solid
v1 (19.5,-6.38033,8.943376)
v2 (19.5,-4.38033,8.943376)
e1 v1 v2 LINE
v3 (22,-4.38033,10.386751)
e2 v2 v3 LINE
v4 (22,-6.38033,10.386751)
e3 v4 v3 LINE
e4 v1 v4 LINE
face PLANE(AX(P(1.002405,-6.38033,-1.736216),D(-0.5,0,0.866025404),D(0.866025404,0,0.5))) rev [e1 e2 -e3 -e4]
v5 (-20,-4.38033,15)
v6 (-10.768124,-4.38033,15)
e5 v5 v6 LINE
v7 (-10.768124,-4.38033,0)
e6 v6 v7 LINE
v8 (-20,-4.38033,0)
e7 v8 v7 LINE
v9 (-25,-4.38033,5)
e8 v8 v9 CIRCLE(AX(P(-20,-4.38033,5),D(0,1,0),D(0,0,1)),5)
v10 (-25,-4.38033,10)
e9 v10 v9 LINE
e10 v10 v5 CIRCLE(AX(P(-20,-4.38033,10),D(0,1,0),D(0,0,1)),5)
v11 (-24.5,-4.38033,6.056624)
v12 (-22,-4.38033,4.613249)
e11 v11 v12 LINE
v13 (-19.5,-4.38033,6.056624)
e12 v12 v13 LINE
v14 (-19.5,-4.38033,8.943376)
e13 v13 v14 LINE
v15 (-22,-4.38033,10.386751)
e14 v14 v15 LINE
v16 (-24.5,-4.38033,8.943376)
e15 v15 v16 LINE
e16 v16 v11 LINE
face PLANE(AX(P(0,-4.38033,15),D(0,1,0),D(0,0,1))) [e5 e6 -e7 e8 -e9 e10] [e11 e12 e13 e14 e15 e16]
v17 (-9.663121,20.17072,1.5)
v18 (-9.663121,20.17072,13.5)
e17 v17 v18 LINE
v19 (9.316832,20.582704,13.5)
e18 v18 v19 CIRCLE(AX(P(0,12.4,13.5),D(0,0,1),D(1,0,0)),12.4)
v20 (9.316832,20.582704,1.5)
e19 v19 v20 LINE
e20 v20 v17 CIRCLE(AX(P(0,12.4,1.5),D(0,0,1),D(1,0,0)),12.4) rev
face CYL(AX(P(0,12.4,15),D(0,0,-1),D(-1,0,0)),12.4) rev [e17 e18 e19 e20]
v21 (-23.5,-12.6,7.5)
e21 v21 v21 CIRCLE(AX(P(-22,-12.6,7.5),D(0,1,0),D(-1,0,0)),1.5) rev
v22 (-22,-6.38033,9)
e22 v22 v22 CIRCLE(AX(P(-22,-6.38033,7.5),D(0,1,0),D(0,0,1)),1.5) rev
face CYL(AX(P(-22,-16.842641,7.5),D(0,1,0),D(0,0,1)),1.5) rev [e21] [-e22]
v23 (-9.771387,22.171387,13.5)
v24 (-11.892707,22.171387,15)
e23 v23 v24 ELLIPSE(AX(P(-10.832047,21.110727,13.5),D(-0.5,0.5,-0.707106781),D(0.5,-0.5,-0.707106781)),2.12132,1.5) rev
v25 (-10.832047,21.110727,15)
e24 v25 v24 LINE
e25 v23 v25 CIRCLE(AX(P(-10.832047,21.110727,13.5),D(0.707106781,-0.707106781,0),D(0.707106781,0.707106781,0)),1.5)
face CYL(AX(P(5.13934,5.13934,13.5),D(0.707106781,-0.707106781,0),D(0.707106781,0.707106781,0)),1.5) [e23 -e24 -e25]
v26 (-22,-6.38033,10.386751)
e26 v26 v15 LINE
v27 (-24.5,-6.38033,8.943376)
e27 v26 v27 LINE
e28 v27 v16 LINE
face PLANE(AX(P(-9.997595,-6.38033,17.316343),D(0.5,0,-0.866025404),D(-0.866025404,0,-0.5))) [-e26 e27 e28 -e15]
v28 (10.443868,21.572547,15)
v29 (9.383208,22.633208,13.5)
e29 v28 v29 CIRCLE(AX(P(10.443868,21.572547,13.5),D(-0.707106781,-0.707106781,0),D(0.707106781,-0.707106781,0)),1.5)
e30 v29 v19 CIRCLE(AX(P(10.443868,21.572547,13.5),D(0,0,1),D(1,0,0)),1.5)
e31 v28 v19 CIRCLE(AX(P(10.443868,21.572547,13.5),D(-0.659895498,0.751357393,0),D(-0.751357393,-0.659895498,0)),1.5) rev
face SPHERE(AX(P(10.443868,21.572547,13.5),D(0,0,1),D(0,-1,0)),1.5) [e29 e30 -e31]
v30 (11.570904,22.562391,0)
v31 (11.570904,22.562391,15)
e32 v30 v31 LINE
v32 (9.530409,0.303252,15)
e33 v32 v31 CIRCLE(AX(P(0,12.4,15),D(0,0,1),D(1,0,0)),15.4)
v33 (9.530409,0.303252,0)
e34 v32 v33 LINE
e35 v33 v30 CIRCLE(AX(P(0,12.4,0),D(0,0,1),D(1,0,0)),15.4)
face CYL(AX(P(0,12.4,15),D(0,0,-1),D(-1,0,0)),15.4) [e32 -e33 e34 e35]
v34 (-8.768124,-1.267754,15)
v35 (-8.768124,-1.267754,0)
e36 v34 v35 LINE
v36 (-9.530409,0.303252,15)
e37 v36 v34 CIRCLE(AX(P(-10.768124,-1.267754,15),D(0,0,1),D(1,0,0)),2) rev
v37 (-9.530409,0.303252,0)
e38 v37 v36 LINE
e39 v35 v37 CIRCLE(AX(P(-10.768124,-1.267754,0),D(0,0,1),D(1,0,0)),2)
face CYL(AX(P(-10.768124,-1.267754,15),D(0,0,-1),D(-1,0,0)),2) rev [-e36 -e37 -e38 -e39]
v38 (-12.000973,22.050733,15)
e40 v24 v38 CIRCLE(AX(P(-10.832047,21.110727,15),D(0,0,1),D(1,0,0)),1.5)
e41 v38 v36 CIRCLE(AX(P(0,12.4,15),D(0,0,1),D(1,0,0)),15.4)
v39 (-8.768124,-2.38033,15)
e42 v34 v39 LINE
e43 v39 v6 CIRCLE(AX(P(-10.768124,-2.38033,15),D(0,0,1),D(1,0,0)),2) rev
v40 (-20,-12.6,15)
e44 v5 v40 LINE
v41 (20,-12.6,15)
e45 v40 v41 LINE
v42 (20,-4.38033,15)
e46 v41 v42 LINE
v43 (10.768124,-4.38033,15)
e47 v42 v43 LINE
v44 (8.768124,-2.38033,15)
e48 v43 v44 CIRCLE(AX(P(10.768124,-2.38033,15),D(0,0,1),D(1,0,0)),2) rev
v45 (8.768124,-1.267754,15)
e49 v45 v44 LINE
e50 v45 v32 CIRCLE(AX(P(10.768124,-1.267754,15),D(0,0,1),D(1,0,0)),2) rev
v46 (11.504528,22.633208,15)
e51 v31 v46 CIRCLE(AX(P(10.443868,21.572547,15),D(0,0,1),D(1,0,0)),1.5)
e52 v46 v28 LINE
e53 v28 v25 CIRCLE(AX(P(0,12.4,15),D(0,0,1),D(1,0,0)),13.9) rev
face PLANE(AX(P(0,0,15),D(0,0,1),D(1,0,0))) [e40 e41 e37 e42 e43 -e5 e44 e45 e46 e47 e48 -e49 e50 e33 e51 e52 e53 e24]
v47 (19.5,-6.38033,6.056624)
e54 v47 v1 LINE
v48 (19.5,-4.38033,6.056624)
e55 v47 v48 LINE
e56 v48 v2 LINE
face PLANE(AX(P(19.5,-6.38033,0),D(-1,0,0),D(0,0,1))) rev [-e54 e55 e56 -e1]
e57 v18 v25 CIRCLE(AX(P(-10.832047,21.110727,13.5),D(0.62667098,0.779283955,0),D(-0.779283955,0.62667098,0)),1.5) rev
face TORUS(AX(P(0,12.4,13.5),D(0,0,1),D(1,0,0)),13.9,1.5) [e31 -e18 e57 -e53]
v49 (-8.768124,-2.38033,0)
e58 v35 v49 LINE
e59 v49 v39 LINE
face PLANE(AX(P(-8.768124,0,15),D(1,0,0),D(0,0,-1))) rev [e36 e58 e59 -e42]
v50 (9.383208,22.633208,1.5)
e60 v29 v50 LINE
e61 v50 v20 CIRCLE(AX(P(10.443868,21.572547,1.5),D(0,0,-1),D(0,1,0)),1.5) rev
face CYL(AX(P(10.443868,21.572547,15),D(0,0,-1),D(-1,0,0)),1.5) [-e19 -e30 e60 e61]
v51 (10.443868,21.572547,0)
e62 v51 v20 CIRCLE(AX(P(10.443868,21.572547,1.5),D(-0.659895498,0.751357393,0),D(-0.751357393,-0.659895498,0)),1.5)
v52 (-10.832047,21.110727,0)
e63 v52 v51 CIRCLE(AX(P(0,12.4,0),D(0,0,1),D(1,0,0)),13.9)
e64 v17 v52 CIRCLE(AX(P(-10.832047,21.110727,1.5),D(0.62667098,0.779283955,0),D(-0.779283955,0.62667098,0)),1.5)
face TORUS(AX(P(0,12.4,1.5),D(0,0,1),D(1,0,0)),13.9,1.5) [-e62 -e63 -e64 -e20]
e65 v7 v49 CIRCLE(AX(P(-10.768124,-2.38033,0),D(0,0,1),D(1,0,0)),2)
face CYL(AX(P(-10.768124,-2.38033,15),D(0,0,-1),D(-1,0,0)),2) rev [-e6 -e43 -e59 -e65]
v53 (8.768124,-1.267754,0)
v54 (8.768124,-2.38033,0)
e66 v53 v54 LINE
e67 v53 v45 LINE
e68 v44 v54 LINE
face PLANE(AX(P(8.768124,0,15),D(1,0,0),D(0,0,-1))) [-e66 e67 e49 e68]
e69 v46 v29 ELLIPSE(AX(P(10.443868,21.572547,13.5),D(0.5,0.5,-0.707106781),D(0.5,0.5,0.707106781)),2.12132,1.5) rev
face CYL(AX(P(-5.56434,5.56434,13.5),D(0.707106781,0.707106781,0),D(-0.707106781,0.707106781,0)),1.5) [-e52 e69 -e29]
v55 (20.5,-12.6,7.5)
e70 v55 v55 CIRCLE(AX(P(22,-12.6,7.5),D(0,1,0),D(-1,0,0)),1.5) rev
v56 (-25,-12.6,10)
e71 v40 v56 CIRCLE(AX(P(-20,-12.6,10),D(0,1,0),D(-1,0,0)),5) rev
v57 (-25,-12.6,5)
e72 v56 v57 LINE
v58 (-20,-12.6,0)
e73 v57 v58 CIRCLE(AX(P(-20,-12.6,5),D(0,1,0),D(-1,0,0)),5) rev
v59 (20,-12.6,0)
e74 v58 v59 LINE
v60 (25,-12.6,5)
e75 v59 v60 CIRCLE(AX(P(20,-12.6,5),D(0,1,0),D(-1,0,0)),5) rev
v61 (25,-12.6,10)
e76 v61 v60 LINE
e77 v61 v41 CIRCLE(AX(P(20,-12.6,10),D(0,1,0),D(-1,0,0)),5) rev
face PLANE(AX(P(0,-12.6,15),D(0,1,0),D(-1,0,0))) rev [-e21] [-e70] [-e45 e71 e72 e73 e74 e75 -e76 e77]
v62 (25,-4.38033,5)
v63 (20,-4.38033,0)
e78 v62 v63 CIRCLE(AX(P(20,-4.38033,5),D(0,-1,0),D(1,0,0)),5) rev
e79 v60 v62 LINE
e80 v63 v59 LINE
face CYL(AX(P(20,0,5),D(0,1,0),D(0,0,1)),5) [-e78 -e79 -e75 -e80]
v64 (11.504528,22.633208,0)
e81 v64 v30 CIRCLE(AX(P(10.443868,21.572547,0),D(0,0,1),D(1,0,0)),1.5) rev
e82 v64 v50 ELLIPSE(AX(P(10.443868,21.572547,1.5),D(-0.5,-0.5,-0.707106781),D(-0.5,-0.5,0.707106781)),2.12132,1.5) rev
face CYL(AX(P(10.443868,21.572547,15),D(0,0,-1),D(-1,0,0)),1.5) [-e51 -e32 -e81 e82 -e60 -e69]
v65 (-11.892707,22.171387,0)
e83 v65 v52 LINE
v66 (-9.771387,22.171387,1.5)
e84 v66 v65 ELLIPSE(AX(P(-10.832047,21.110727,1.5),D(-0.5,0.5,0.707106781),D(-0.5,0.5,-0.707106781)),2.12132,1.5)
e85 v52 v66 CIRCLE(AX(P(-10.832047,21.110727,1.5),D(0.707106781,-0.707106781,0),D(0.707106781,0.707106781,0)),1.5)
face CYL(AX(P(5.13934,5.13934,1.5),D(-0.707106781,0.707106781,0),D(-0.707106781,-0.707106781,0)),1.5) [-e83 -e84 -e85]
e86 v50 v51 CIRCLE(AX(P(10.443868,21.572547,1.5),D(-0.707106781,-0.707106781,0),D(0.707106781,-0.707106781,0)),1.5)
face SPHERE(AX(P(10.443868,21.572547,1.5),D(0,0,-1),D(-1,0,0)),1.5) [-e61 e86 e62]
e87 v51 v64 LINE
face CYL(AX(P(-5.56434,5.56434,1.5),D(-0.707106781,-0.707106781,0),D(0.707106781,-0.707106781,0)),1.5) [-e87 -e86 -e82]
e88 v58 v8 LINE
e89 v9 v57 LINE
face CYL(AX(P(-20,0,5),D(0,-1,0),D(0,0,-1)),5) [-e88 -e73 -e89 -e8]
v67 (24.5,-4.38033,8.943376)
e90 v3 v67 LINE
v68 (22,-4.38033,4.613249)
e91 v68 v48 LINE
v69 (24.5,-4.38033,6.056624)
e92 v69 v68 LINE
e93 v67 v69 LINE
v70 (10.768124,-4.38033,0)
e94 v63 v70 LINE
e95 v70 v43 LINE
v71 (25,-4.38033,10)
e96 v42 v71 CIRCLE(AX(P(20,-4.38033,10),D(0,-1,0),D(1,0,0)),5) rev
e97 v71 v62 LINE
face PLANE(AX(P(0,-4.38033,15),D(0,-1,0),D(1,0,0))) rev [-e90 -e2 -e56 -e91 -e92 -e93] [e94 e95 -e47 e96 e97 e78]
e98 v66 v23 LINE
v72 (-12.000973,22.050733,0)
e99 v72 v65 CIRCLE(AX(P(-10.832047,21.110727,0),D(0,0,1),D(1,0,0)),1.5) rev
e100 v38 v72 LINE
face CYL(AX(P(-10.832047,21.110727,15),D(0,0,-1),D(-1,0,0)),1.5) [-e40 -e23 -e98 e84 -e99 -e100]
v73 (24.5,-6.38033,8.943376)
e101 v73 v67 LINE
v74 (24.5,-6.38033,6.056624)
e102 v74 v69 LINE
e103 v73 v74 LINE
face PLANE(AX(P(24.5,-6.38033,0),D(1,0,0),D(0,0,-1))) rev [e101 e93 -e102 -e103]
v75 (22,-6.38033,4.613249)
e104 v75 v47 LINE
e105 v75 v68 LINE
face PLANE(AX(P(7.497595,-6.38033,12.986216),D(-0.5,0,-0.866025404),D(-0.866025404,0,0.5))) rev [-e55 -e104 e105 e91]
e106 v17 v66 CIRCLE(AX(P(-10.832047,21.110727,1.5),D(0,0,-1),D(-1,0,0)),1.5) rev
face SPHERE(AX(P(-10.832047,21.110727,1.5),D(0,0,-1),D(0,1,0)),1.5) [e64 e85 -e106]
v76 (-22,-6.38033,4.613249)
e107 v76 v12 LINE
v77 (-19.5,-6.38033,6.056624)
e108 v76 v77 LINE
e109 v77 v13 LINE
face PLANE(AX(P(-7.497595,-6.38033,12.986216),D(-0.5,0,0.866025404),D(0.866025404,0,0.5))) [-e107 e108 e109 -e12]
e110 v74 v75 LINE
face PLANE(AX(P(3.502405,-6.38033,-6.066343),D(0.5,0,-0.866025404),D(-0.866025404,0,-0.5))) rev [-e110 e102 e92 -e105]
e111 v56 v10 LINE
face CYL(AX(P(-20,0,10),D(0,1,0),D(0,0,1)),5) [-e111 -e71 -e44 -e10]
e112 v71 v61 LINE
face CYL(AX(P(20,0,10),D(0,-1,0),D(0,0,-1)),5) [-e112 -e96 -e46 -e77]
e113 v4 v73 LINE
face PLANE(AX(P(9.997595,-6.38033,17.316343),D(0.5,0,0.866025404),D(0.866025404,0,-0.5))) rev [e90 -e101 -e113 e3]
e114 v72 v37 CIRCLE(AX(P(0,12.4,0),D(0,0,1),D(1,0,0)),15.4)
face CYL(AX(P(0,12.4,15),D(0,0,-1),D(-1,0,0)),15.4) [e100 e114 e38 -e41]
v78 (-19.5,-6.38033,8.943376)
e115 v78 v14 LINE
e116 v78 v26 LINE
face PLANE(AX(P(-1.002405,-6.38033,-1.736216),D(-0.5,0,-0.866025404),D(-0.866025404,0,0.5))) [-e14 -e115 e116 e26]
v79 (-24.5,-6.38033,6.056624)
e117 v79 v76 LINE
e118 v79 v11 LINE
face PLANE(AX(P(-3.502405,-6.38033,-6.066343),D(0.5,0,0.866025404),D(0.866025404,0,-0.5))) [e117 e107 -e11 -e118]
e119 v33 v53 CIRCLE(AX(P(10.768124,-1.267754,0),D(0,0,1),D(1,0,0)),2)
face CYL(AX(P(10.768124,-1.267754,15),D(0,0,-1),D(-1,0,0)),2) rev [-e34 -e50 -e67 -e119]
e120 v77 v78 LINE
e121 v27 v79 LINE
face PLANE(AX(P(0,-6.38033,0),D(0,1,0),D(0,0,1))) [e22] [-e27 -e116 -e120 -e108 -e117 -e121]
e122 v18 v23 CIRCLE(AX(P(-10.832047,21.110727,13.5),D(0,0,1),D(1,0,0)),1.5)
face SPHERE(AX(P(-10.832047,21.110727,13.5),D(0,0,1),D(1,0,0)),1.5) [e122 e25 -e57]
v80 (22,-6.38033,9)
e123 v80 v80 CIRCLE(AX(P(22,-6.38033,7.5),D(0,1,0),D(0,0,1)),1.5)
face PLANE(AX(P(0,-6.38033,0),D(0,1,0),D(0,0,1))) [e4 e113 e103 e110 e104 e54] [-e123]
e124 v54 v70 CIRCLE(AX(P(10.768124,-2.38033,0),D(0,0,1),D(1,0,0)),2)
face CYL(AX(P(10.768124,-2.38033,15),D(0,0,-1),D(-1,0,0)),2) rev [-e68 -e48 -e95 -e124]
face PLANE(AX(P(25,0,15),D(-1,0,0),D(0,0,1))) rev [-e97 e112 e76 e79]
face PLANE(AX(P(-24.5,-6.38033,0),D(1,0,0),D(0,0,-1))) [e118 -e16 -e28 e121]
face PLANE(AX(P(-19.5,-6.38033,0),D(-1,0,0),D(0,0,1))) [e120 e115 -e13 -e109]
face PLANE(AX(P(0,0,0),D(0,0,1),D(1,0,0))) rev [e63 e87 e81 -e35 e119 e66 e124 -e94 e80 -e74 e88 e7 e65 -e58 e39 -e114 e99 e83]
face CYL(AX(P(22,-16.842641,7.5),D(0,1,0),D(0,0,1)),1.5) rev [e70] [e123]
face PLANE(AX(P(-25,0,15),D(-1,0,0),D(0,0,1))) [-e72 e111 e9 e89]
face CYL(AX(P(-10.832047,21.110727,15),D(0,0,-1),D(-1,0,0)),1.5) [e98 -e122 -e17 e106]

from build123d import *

# Parameters (mm, degrees)
RESSALTO_EXTRUS_O1_DEPTH = 15
ESBO_O3_R                = 1.5
CORTE_EXTRUS_O1_DEPTH    = 8.219669914
CORTE_EXTRUS_O2_DEPTH    = 2
FILETE1_R                = 1.5
FILETE2_R                = 2
FILETE3_R                = 5


with BuildPart() as part:
    # Esboço2 → Ressalto-extrusão1 (new body)
    with BuildSketch(Plane.XY):
        with BuildLine():
            Line((-25, -4.380330086), (-25, -12.6))
            Line((-25, -12.6), (25, -12.6))
            Line((25, -12.6), (25, -4.380330086))
            Line((25, -4.380330086), (8.768124087, -4.380330086))
            Line((8.768124087, -4.380330086), (8.768124087, -0.260173774))
            ThreePointArc((8.768124087, -0.260173774), (15.361943152, 11.318009898), (10.456147688, 23.706147688))
            Line((10.456147688, 23.706147688), (8.332817936, 21.582817936))
            ThreePointArc((8.332817936, 21.582817936), (0.30060873, 0.00364431), (-8.768124087, 21.168124087))
            Line((-8.768124087, 21.168124087), (-10.88944443, 23.28944443))
            ThreePointArc((-10.88944443, 23.28944443), (-15.337898467, 11.018381166), (-8.768124087, -0.260173774))
            Line((-8.768124087, -0.260173774), (-8.768124087, -4.380330086))
            Line((-8.768124087, -4.380330086), (-25, -4.380330086))
        make_face()
    extrude(amount=RESSALTO_EXTRUS_O1_DEPTH)

    # Esboço3 → Corte-extrusão1 (cut)
    with BuildSketch(Plane(origin=(0, -4.380330086, 0), x_dir=(1, 0, 0), z_dir=(0, 1, 0))):
        with Locations(Location((22, -7.5, 0), (0, 0, 270))):
            Circle(ESBO_O3_R)
        with Locations(Location((-22, -7.5, 0), (0, 0, 180))):
            Circle(ESBO_O3_R)
    extrude(amount=-CORTE_EXTRUS_O1_DEPTH, mode=Mode.SUBTRACT)

    # Esboço5 → Corte-extrusão2 (cut)
    with BuildSketch(Plane(origin=(0, -4.380330086, 0), x_dir=(1, 0, 0), z_dir=(0, 1, 0))):
        Polygon((22, -4.613248654), (19.5, -6.056624327), (19.5, -8.943375673), (22, -10.386751346), (24.5, -8.943375673), (24.5, -6.056624327), align=None)
        Polygon((-24.5, -6.056624327), (-22, -4.613248654), (-19.5, -6.056624327), (-19.5, -8.943375673), (-22, -10.386751346), (-24.5, -8.943375673), align=None)
    extrude(amount=-CORTE_EXTRUS_O2_DEPTH, mode=Mode.SUBTRACT)

    # Filete1
    filete1_edges = [part.edges().sort_by_distance(p)[0] for p in [
        (9.394482812, 22.644482812, 15),
        (-9.828784258, 22.228784258, 0),
        (0.30060873, 0.00364431, 0),
        (9.394482812, 22.644482812, 0),
        (0.30060873, 0.00364431, 15),
        (-10.88944443, 23.28944443, 7.5),
        (-8.768124087, 21.168124087, 7.5),
        (8.332817936, 21.582817936, 7.5),
        (10.456147688, 23.706147688, 7.5),
        (-9.828784258, 22.228784258, 15),
    ]]
    fillet(filete1_edges, radius=FILETE1_R - 0.0001)  # a hair under: the kernel refuses the full size

    # Filete2
    filete2_edges = [part.edges().sort_by_distance(p)[0] for p in [
        (8.768124087, -4.380330086, 7.5),
        (-8.768124087, -4.380330086, 7.5),
        (-8.768124087, -0.260173774, 7.5),
        (8.768124087, -0.260173774, 7.5),
    ]]
    fillet(filete2_edges, radius=FILETE2_R)

    # Filete3
    filete3_edges = [part.edges().sort_by_distance(p)[0] for p in [
        (25, -8.490165043, 0),
        (-25, -8.490165043, 0),
        (-25, -8.490165043, 15),
        (25, -8.490165043, 15),
    ]]
    fillet(filete3_edges, radius=FILETE3_R)


solid = part.part
